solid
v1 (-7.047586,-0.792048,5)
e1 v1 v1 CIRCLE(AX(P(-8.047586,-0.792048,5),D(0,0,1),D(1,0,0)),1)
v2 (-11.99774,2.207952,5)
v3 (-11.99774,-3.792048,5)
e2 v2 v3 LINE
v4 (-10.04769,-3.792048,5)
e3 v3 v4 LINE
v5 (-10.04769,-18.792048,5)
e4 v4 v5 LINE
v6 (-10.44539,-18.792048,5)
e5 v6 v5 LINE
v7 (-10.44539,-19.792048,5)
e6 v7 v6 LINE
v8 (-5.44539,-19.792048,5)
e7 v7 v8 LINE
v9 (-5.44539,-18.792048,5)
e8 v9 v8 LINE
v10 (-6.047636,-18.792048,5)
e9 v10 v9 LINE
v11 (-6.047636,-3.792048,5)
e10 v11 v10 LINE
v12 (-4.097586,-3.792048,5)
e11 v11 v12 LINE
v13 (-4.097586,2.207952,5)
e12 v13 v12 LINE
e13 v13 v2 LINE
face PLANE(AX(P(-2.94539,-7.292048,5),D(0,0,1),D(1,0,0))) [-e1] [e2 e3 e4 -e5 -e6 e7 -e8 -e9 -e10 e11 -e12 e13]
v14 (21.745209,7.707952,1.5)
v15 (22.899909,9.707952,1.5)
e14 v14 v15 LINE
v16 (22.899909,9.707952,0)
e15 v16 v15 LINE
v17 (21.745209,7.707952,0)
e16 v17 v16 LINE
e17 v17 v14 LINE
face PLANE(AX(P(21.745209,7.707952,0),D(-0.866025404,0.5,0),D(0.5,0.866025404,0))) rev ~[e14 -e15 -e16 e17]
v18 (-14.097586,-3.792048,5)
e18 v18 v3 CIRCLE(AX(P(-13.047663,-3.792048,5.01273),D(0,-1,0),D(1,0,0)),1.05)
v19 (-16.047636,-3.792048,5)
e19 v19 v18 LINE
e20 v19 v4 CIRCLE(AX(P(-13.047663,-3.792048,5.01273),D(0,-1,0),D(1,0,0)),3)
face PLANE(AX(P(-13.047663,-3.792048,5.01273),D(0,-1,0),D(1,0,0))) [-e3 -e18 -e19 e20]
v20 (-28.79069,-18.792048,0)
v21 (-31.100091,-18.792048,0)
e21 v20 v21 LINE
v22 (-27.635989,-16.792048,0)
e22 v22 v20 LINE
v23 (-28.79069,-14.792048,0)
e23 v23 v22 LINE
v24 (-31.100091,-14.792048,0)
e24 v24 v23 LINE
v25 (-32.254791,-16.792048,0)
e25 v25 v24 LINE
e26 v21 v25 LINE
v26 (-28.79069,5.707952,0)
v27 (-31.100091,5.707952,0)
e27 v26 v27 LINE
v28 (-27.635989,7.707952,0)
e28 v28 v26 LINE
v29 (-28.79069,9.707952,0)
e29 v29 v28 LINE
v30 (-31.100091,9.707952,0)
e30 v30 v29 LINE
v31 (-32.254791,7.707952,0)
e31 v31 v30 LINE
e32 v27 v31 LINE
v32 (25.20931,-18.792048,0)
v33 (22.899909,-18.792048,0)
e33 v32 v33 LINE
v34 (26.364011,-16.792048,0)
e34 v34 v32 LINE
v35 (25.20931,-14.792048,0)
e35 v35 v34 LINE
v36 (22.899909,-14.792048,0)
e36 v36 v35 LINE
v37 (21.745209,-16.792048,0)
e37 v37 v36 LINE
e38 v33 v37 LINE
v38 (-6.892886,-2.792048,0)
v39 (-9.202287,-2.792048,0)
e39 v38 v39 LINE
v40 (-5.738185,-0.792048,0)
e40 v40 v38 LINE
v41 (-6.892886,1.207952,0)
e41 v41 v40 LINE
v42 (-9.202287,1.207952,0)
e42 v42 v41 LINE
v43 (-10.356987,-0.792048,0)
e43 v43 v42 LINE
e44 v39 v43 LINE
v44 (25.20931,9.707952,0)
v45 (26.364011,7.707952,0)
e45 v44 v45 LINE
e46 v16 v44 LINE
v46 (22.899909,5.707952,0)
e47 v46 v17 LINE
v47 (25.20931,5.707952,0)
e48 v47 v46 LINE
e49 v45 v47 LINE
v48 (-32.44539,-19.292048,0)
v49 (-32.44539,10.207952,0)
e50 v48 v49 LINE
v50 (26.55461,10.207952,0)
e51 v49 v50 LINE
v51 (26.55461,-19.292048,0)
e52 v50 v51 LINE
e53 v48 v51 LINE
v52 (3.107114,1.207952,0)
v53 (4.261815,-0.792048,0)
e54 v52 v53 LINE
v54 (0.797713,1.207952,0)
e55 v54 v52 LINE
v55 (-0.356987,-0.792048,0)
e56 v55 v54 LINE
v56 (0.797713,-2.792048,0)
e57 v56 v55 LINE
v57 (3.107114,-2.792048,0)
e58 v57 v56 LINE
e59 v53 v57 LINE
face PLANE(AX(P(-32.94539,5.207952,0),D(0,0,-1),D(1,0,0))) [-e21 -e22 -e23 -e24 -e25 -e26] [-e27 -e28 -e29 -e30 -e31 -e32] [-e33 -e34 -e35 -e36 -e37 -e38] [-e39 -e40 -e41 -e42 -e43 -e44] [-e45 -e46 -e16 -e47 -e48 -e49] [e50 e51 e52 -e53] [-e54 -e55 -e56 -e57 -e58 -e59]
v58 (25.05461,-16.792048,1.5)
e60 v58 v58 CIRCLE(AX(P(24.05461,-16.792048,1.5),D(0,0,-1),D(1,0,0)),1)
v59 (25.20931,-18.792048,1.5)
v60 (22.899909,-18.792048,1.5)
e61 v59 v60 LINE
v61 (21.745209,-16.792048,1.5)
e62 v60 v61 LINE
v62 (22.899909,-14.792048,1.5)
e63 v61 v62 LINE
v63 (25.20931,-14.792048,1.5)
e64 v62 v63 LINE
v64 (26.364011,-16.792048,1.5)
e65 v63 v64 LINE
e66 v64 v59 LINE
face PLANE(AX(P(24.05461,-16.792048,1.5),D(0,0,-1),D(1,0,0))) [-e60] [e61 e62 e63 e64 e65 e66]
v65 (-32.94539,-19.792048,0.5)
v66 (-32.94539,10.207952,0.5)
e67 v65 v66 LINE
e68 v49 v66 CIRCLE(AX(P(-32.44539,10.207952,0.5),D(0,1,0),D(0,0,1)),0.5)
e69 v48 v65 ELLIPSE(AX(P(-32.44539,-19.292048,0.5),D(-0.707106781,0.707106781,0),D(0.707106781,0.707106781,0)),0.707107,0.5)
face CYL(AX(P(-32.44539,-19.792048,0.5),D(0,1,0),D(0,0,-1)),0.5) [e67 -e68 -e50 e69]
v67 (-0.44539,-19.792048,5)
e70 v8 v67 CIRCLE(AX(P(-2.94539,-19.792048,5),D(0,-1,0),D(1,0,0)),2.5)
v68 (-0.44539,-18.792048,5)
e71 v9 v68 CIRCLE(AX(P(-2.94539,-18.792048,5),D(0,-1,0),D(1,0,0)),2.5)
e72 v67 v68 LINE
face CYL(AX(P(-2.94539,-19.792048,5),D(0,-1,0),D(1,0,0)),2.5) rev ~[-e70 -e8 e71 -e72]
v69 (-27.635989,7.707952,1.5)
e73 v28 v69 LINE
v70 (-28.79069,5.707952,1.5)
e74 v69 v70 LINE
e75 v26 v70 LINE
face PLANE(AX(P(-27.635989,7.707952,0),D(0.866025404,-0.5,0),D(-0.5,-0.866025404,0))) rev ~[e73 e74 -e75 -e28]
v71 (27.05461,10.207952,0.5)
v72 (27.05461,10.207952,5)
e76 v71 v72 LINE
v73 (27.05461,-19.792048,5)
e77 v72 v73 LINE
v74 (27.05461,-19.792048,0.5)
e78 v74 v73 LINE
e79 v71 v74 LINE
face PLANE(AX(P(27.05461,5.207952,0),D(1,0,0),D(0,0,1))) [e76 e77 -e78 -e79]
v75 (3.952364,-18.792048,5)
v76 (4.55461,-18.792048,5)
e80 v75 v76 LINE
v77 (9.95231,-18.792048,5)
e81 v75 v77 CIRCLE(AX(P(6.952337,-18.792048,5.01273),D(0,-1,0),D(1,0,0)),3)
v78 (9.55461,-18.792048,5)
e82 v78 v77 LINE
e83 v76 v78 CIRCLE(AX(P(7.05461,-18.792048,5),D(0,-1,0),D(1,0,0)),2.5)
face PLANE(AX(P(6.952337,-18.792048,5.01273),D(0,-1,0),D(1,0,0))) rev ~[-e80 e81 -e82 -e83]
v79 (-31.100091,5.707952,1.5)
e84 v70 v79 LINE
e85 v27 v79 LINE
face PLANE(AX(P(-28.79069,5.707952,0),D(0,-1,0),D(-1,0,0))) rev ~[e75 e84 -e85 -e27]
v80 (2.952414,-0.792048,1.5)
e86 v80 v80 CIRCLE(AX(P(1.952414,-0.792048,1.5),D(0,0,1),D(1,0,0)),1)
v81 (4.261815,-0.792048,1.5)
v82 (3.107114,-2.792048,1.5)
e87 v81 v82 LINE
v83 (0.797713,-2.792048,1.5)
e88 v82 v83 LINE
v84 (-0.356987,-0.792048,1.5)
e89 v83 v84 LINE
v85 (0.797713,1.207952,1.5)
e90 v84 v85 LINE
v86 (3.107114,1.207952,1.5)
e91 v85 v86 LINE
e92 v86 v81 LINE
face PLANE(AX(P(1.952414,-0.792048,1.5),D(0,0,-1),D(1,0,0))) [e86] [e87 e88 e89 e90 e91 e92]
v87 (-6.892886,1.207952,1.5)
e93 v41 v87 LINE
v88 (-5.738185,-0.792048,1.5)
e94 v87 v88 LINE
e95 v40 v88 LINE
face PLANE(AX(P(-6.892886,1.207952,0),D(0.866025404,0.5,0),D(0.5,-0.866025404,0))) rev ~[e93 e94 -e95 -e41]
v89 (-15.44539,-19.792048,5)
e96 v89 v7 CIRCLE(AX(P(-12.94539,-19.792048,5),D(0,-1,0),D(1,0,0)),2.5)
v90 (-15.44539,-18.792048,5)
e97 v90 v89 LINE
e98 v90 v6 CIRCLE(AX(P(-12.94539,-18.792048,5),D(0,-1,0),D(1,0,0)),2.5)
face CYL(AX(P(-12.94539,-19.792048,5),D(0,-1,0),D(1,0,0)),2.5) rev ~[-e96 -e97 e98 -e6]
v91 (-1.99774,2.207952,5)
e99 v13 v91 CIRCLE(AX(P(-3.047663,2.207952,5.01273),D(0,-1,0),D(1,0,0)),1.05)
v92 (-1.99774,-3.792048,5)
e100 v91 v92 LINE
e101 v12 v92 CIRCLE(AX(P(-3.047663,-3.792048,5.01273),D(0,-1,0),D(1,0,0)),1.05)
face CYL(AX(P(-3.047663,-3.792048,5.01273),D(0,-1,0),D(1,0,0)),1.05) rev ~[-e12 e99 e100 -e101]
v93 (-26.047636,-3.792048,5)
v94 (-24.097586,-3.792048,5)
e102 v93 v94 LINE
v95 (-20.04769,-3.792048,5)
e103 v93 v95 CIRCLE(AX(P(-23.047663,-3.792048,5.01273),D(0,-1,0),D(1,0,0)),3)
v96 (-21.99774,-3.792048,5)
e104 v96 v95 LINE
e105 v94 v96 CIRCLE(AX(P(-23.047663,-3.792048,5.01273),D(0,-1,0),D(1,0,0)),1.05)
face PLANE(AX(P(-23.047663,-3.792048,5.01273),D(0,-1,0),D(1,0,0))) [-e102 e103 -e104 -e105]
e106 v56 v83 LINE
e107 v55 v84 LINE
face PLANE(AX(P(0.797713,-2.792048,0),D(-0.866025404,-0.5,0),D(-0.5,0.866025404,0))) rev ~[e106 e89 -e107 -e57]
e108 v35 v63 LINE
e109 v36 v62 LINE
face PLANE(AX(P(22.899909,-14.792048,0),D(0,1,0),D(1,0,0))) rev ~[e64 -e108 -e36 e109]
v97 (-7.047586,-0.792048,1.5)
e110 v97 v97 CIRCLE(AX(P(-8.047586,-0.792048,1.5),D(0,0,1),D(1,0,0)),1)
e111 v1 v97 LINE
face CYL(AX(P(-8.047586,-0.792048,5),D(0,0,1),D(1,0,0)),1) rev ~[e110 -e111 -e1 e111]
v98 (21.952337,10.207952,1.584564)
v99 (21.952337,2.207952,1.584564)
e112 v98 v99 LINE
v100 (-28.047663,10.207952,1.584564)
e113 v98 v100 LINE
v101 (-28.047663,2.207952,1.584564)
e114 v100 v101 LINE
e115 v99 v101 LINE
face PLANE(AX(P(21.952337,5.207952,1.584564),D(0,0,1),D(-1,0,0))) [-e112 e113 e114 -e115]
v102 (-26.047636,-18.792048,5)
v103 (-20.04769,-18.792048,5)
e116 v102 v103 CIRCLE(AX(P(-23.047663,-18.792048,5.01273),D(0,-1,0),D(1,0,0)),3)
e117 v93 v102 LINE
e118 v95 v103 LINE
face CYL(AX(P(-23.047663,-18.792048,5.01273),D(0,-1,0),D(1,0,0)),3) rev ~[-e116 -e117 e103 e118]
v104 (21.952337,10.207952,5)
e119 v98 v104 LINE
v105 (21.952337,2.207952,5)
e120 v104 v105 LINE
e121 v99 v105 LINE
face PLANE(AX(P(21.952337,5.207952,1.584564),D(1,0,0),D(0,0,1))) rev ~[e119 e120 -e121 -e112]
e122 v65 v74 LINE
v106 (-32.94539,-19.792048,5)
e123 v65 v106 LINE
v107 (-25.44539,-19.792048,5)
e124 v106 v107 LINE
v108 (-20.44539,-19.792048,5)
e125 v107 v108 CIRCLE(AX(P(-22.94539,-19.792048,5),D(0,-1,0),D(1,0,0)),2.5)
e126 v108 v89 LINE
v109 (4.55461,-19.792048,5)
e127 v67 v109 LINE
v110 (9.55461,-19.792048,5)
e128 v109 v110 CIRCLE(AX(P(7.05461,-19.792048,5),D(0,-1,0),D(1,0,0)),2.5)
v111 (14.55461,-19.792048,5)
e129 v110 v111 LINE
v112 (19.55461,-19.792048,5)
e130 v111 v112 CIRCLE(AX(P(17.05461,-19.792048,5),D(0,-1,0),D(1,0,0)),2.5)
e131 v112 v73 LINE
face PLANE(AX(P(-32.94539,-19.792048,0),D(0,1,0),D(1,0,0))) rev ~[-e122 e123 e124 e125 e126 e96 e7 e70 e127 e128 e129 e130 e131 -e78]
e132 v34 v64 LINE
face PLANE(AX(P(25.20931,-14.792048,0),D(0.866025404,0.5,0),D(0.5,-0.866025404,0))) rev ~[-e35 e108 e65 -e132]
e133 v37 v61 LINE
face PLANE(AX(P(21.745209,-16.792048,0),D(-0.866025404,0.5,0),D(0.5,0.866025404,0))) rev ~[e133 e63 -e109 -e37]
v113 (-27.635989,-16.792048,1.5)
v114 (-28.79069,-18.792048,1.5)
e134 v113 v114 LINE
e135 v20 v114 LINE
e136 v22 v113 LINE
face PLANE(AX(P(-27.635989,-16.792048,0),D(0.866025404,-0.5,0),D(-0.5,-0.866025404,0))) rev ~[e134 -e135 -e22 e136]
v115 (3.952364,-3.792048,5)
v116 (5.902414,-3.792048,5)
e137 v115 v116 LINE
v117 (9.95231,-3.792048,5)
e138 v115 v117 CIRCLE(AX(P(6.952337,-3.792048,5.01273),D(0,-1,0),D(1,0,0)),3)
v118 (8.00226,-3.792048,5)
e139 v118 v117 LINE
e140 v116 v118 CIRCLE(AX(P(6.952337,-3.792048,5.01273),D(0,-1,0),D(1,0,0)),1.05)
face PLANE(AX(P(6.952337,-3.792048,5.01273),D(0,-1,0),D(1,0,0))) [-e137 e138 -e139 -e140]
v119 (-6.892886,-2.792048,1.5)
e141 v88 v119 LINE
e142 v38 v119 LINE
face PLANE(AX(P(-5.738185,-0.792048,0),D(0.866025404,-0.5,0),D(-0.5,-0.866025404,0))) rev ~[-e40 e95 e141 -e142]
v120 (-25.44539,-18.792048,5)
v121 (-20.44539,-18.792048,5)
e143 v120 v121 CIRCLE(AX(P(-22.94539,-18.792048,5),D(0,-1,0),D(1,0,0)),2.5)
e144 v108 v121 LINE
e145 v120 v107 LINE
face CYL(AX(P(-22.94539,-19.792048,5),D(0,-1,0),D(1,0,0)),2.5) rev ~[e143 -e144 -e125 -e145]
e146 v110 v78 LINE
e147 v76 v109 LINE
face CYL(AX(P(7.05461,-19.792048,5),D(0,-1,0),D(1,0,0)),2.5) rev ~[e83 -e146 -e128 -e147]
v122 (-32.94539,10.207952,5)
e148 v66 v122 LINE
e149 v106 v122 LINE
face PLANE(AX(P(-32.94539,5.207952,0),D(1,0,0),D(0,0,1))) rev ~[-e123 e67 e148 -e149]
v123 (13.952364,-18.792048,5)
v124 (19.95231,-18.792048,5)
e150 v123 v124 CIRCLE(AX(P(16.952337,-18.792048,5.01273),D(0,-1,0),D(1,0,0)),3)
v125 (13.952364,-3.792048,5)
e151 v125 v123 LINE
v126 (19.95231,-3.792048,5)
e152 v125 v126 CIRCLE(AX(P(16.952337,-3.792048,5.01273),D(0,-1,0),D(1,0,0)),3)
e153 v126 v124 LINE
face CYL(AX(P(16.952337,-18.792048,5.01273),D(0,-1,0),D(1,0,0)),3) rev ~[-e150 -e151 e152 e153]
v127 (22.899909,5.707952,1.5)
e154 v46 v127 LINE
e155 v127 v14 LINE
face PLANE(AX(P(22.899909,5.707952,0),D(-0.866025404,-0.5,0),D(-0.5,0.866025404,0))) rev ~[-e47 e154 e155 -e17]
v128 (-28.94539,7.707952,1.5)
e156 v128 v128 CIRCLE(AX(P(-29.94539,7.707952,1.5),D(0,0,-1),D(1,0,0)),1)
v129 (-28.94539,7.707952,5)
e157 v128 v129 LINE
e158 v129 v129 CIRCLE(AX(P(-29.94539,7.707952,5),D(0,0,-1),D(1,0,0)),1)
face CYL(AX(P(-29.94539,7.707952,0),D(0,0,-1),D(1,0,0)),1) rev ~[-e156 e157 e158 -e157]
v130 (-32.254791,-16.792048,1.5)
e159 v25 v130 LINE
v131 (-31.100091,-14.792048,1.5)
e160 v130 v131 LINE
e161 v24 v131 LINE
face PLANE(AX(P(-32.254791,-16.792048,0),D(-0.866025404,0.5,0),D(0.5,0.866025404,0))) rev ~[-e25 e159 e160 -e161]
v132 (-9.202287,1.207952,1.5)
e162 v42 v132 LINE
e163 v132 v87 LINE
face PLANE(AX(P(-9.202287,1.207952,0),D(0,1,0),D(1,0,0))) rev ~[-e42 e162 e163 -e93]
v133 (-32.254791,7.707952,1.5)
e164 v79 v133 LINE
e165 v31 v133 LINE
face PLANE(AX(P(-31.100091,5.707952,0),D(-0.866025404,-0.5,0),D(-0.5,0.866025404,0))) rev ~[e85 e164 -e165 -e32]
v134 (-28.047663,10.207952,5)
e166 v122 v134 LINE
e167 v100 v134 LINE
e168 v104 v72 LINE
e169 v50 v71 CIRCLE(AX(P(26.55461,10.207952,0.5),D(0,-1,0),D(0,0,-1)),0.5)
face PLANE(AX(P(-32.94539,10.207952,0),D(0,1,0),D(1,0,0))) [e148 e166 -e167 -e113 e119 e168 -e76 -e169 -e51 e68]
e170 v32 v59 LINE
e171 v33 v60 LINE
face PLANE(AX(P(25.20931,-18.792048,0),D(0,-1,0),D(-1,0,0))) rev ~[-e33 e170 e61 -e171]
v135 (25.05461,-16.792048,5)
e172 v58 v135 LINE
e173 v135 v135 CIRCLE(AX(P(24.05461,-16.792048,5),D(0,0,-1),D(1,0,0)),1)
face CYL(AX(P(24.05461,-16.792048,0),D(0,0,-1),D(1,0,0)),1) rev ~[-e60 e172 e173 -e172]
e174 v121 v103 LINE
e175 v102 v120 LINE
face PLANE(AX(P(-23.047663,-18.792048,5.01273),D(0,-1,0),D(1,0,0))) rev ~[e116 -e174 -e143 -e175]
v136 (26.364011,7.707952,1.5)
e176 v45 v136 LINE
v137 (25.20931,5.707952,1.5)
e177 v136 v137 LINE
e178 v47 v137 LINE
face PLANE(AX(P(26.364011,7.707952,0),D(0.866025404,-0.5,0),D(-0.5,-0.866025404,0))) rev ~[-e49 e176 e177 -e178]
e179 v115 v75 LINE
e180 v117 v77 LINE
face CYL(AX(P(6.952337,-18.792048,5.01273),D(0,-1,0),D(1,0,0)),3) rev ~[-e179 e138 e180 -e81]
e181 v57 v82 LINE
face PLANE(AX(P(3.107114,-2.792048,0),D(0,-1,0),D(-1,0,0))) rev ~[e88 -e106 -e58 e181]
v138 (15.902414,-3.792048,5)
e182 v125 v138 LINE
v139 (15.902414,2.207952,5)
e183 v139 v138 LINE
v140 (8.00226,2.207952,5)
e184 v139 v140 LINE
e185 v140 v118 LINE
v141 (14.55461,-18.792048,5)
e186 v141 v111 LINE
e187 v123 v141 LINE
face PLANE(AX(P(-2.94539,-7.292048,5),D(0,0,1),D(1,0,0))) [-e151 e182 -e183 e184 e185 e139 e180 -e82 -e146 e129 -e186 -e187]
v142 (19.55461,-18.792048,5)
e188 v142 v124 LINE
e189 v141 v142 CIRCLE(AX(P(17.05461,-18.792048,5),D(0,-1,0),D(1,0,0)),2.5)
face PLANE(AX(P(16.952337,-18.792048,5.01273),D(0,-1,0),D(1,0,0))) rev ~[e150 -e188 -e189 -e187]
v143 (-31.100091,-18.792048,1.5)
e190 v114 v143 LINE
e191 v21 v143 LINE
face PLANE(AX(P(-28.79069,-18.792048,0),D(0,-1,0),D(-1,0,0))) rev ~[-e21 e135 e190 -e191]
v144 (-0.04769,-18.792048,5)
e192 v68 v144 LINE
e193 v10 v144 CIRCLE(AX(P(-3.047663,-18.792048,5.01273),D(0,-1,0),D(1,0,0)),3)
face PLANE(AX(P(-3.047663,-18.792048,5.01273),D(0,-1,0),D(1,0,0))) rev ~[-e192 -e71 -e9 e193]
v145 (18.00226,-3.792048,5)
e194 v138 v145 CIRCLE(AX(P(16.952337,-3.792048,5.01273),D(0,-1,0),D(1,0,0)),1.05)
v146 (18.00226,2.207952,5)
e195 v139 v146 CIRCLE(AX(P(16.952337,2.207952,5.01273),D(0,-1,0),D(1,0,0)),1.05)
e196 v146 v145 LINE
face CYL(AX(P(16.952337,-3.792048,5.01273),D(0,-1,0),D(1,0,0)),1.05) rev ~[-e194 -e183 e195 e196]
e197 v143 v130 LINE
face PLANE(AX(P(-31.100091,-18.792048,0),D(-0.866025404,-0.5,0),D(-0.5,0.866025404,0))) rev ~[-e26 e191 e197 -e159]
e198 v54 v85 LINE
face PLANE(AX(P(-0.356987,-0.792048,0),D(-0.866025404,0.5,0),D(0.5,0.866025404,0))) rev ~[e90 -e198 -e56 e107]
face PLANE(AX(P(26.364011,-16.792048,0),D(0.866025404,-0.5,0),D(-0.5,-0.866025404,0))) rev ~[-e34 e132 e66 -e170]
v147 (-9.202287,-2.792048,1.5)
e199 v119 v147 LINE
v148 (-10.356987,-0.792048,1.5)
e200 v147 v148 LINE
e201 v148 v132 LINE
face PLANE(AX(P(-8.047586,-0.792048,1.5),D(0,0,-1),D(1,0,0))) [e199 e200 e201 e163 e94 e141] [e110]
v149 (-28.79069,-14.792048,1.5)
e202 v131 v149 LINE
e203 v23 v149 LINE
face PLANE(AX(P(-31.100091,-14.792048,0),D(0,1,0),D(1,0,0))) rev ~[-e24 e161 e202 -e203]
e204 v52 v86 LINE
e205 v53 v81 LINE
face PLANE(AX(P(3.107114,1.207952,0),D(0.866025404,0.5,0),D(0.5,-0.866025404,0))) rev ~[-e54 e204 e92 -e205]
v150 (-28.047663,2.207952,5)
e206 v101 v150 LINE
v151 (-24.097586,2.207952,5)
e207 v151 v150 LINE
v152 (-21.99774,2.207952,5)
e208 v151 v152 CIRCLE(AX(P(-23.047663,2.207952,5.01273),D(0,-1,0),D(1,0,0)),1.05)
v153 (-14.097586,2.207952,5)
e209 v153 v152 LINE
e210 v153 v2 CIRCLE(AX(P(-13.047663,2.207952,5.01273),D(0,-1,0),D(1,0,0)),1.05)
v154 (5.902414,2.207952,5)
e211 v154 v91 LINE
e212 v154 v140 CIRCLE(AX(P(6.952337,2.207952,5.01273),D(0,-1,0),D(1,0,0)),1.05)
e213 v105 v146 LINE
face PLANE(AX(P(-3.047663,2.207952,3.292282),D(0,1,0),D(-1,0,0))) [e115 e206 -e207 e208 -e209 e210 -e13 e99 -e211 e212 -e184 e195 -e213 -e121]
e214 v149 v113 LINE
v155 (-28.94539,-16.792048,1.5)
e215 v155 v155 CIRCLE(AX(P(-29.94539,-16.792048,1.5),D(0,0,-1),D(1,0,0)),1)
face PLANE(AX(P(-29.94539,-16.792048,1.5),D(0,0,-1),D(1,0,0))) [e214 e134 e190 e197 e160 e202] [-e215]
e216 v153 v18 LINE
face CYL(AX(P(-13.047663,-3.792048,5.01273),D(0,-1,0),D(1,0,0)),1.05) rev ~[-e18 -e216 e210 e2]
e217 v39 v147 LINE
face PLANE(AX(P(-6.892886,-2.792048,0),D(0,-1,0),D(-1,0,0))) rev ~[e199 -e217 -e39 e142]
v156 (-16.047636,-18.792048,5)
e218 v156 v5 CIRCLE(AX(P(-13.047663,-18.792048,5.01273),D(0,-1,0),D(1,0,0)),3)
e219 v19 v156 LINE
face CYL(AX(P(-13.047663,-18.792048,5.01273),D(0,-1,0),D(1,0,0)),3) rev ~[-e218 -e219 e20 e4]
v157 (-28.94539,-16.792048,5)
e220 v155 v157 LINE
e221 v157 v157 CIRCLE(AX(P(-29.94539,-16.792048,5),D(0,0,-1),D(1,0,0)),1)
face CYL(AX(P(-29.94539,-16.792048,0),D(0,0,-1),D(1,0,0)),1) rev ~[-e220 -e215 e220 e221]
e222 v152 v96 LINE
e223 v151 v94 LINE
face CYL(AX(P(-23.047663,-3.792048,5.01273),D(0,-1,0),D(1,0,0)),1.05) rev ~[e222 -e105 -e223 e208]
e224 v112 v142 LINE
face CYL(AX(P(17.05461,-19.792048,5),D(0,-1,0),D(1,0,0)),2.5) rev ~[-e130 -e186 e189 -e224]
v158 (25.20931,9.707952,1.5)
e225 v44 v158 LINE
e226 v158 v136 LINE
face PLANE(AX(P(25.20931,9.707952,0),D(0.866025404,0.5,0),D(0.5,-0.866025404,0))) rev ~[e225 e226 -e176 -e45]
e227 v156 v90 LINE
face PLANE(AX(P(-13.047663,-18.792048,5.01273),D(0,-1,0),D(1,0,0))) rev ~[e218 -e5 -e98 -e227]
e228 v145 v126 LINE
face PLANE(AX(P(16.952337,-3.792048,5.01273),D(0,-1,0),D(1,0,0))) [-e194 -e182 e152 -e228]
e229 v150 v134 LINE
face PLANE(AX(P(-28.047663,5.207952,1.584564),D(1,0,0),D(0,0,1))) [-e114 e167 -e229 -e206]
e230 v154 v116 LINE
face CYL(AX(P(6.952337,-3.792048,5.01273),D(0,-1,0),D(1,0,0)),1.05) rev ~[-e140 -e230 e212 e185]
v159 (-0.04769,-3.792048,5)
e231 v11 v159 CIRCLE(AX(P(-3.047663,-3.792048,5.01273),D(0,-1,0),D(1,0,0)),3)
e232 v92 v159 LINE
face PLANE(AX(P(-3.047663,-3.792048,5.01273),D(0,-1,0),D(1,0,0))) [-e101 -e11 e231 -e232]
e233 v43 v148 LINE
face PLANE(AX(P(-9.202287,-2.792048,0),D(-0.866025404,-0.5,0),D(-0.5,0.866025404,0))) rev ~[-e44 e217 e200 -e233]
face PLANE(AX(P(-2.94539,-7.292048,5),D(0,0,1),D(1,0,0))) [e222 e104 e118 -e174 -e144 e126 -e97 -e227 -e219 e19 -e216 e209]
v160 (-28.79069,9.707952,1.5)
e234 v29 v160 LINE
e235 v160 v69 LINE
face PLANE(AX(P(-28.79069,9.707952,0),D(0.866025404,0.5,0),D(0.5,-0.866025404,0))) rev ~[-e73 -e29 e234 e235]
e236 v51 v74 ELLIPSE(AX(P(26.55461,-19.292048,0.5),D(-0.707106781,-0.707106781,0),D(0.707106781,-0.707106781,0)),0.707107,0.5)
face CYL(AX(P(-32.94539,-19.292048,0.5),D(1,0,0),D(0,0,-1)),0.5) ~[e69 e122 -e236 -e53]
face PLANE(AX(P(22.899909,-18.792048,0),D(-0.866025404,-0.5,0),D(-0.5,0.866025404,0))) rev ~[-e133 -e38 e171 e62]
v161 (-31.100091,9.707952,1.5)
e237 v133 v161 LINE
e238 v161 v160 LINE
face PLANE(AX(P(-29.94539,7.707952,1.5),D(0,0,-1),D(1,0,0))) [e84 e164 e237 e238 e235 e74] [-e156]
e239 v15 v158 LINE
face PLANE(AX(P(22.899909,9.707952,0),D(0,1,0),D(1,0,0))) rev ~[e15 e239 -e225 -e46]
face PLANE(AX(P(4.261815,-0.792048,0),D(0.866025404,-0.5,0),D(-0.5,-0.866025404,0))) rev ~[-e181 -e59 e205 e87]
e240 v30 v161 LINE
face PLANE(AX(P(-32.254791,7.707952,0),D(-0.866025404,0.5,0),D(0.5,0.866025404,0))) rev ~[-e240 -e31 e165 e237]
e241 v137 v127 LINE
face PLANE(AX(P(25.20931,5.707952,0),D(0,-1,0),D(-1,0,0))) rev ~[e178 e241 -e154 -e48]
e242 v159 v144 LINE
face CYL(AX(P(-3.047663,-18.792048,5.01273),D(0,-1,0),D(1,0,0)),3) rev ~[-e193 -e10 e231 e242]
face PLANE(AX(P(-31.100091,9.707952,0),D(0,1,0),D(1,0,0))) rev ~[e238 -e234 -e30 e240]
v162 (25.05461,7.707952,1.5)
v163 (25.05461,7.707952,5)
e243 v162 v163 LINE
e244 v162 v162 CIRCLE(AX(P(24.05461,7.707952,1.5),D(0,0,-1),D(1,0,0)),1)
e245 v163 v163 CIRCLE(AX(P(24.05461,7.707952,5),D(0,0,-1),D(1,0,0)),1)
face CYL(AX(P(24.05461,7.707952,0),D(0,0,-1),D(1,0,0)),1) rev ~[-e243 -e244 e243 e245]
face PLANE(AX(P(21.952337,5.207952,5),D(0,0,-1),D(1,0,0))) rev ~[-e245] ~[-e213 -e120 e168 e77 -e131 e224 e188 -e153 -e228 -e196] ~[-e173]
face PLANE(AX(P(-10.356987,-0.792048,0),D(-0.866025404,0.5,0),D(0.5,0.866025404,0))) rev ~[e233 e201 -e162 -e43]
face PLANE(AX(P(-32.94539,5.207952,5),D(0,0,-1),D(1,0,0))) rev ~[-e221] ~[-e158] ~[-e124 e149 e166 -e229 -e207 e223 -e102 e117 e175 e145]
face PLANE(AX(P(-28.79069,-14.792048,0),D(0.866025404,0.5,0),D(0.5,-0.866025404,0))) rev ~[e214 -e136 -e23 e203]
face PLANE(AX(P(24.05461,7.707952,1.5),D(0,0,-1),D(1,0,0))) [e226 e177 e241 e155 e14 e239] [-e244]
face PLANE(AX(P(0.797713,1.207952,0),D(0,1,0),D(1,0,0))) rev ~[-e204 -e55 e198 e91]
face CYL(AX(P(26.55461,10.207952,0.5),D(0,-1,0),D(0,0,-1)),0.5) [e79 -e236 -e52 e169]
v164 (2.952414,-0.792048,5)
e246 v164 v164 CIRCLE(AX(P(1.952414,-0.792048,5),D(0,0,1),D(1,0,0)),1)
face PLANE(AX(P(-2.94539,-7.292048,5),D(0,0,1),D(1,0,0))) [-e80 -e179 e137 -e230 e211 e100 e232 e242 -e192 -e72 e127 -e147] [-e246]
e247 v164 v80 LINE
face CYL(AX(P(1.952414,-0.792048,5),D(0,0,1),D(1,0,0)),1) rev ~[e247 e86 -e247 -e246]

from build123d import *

# Parameters (mm, degrees)
F0_W      = 60
F0_H      = 25
F1_DEPTH  = 5
F2_R      = 2.5
F3_DEPTH  = 10
F5_R      = 3
F6_DEPTH  = 15
F7_R      = 1.05
F8_DEPTH  = 29
F9_W      = 50
F9_H      = 3.4154356362
F10_DEPTH = 3
F11_DEPTH = 5
F12_R     = 0.5
F14_R     = 1
F13_R     = 1
F15_DEPTH = 5.001
F16_R     = 1
F17_DEPTH = 5
F19_DEPTH = 1.5


with BuildPart() as f1:
    # F0 (on Top) → F1 (new body)
    with BuildSketch(Plane.XY):
        with Locations((-2.9453901201, -7.2920476746)):
            Rectangle(F0_W, F0_H)
    extrude(amount=F1_DEPTH)

    # F2 (on face) → F3 (cut)
    with BuildSketch(Plane.XZ.offset(19.7920476746)):
        with Locations((-22.9453901201, 5)):
            Circle(F2_R)
        with Locations((-12.9453901201, 5)):
            Circle(F2_R)
        with Locations((-2.9453901201, 5)):
            Circle(F2_R)
        with Locations((7.0546098799, 5)):
            Circle(F2_R)
        with Locations((17.0546098799, 5)):
            Circle(F2_R)
    extrude(amount=-F3_DEPTH, mode=Mode.SUBTRACT)

    # F5 (on offset) → F6 (cut)
    with BuildSketch(Plane.XZ.offset(18.7920476746)):
        with Locations((-23.0476632714, 5.0127296709)):
            Circle(F5_R)
        with Locations((-13.0476632714, 5.0127296709)):
            Circle(F5_R)
        with Locations((-3.0476632714, 5.0127296709)):
            Circle(F5_R)
        with Locations((6.9523367286, 5.0127296709)):
            Circle(F5_R)
        with Locations((16.9523367286, 5.0127296709)):
            Circle(F5_R)
    extrude(amount=-F6_DEPTH, mode=Mode.SUBTRACT)

    # F7 (on face) → F8 (cut)
    with BuildSketch(Plane.XZ.offset(3.7920476746)):
        with Locations((-23.0476632714, 5.0127296709)):
            Circle(F7_R)
        with Locations((-13.0476632714, 5.0127296709)):
            Circle(F7_R)
        with Locations((-3.0476632714, 5.0127296709)):
            Circle(F7_R)
        with Locations((6.9523367286, 5.0127296709)):
            Circle(F7_R)
        with Locations((16.9523367286, 5.0127296709)):
            Circle(F7_R)
    extrude(amount=-F8_DEPTH, mode=Mode.SUBTRACT)

    # F9 (on face) → F10 (cut)
    with BuildSketch(Plane(origin=(0, 5.2079523254, 0), x_dir=(-1, 0, 0), z_dir=(0, 1, 0))):
        with Locations((3.0476632714, 3.2922821819)):
            Rectangle(F9_W, F9_H)
    extrude(amount=-F10_DEPTH, mode=Mode.SUBTRACT)

    # F11 (add): a face of the model
    f11_faces = [f1.faces().sort_by_distance(p)[0] for p in [
        (-2.8102387692, 5.2079523254, 1.4530193808),
    ]]
    extrude(f11_faces, amount=F11_DEPTH)

    # F12
    f12_edges = [f1.edges().sort_by_distance(p)[0] for p in [
        (27.05461, -4.792048, 0),
        (-2.94539, -19.792048, 0),
        (-32.94539, -4.792048, 0),
    ]]
    fillet(f12_edges, radius=F12_R)

    # F14 (on face) + F13 (on face) → F15 (cut, through all)
    with BuildSketch(Plane(origin=(0, 0, 0), x_dir=(1, 0, 0), z_dir=(0, 0, -1))):
        with Locations((-29.9453901201, -7.7079523254)):
            Circle(F14_R)
        with Locations((24.0546098799, -7.7079523254)):
            Circle(F14_R)
    with BuildSketch(Plane(origin=(0, 0, 0), x_dir=(1, 0, 0), z_dir=(0, 0, -1))):
        with Locations((-29.9453901201, 16.7920476746)):
            Circle(F13_R)
        with Locations((24.0546098799, 16.7920476746)):
            Circle(F13_R)
    extrude(amount=-F15_DEPTH, mode=Mode.SUBTRACT)

    # F16 (on face) → F17 (cut)
    with BuildSketch(Plane.XY.offset(5)):
        with Locations((1.9524138955, -0.7920476746)):
            Circle(F16_R)
        with Locations((-8.0475861045, -0.7920476746)):
            Circle(F16_R)
    extrude(amount=-F17_DEPTH, mode=Mode.SUBTRACT)

    # F18 (on face) → F19 (cut)
    with BuildSketch(Plane(origin=(0, 0, 0), x_dir=(1, 0, 0), z_dir=(0, 0, -1))):
        Polygon((25.2093104182, -5.7079523254), (22.8999093415, -5.7079523254), (21.7452088031, -7.7079523254), (22.8999093415, -9.7079523254), (25.2093104182, -9.7079523254), (26.3640109566, -7.7079523254), align=None)
        Polygon((25.2093104182, 18.7920476746), (22.8999093415, 18.7920476746), (21.7452088031, 16.7920476746), (22.8999093415, 14.7920476746), (25.2093104182, 14.7920476746), (26.3640109566, 16.7920476746), align=None)
        Polygon((-28.7906895818, 18.7920476746), (-31.1000906585, 18.7920476746), (-32.2547911969, 16.7920476746), (-31.1000906585, 14.7920476746), (-28.7906895818, 14.7920476746), (-27.6359890434, 16.7920476746), align=None)
        Polygon((-31.1000906585, -9.7079523254), (-28.7906895818, -9.7079523254), (-27.6359890434, -7.7079523254), (-28.7906895818, -5.7079523254), (-31.1000906585, -5.7079523254), (-32.2547911969, -7.7079523254), align=None)
        Polygon((0.7977133571, -1.2079523254), (3.1071144338, -1.2079523254), (4.2618149722, 0.7920476746), (3.1071144338, 2.7920476746), (0.7977133571, 2.7920476746), (-0.3569871813, 0.7920476746), align=None)
        Polygon((-9.2022866429, -1.2079523254), (-6.8928855662, -1.2079523254), (-5.7381850278, 0.7920476746), (-6.8928855662, 2.7920476746), (-9.2022866429, 2.7920476746), (-10.3569871813, 0.7920476746), align=None)
    extrude(amount=-F19_DEPTH, mode=Mode.SUBTRACT)


solid = f1.part
